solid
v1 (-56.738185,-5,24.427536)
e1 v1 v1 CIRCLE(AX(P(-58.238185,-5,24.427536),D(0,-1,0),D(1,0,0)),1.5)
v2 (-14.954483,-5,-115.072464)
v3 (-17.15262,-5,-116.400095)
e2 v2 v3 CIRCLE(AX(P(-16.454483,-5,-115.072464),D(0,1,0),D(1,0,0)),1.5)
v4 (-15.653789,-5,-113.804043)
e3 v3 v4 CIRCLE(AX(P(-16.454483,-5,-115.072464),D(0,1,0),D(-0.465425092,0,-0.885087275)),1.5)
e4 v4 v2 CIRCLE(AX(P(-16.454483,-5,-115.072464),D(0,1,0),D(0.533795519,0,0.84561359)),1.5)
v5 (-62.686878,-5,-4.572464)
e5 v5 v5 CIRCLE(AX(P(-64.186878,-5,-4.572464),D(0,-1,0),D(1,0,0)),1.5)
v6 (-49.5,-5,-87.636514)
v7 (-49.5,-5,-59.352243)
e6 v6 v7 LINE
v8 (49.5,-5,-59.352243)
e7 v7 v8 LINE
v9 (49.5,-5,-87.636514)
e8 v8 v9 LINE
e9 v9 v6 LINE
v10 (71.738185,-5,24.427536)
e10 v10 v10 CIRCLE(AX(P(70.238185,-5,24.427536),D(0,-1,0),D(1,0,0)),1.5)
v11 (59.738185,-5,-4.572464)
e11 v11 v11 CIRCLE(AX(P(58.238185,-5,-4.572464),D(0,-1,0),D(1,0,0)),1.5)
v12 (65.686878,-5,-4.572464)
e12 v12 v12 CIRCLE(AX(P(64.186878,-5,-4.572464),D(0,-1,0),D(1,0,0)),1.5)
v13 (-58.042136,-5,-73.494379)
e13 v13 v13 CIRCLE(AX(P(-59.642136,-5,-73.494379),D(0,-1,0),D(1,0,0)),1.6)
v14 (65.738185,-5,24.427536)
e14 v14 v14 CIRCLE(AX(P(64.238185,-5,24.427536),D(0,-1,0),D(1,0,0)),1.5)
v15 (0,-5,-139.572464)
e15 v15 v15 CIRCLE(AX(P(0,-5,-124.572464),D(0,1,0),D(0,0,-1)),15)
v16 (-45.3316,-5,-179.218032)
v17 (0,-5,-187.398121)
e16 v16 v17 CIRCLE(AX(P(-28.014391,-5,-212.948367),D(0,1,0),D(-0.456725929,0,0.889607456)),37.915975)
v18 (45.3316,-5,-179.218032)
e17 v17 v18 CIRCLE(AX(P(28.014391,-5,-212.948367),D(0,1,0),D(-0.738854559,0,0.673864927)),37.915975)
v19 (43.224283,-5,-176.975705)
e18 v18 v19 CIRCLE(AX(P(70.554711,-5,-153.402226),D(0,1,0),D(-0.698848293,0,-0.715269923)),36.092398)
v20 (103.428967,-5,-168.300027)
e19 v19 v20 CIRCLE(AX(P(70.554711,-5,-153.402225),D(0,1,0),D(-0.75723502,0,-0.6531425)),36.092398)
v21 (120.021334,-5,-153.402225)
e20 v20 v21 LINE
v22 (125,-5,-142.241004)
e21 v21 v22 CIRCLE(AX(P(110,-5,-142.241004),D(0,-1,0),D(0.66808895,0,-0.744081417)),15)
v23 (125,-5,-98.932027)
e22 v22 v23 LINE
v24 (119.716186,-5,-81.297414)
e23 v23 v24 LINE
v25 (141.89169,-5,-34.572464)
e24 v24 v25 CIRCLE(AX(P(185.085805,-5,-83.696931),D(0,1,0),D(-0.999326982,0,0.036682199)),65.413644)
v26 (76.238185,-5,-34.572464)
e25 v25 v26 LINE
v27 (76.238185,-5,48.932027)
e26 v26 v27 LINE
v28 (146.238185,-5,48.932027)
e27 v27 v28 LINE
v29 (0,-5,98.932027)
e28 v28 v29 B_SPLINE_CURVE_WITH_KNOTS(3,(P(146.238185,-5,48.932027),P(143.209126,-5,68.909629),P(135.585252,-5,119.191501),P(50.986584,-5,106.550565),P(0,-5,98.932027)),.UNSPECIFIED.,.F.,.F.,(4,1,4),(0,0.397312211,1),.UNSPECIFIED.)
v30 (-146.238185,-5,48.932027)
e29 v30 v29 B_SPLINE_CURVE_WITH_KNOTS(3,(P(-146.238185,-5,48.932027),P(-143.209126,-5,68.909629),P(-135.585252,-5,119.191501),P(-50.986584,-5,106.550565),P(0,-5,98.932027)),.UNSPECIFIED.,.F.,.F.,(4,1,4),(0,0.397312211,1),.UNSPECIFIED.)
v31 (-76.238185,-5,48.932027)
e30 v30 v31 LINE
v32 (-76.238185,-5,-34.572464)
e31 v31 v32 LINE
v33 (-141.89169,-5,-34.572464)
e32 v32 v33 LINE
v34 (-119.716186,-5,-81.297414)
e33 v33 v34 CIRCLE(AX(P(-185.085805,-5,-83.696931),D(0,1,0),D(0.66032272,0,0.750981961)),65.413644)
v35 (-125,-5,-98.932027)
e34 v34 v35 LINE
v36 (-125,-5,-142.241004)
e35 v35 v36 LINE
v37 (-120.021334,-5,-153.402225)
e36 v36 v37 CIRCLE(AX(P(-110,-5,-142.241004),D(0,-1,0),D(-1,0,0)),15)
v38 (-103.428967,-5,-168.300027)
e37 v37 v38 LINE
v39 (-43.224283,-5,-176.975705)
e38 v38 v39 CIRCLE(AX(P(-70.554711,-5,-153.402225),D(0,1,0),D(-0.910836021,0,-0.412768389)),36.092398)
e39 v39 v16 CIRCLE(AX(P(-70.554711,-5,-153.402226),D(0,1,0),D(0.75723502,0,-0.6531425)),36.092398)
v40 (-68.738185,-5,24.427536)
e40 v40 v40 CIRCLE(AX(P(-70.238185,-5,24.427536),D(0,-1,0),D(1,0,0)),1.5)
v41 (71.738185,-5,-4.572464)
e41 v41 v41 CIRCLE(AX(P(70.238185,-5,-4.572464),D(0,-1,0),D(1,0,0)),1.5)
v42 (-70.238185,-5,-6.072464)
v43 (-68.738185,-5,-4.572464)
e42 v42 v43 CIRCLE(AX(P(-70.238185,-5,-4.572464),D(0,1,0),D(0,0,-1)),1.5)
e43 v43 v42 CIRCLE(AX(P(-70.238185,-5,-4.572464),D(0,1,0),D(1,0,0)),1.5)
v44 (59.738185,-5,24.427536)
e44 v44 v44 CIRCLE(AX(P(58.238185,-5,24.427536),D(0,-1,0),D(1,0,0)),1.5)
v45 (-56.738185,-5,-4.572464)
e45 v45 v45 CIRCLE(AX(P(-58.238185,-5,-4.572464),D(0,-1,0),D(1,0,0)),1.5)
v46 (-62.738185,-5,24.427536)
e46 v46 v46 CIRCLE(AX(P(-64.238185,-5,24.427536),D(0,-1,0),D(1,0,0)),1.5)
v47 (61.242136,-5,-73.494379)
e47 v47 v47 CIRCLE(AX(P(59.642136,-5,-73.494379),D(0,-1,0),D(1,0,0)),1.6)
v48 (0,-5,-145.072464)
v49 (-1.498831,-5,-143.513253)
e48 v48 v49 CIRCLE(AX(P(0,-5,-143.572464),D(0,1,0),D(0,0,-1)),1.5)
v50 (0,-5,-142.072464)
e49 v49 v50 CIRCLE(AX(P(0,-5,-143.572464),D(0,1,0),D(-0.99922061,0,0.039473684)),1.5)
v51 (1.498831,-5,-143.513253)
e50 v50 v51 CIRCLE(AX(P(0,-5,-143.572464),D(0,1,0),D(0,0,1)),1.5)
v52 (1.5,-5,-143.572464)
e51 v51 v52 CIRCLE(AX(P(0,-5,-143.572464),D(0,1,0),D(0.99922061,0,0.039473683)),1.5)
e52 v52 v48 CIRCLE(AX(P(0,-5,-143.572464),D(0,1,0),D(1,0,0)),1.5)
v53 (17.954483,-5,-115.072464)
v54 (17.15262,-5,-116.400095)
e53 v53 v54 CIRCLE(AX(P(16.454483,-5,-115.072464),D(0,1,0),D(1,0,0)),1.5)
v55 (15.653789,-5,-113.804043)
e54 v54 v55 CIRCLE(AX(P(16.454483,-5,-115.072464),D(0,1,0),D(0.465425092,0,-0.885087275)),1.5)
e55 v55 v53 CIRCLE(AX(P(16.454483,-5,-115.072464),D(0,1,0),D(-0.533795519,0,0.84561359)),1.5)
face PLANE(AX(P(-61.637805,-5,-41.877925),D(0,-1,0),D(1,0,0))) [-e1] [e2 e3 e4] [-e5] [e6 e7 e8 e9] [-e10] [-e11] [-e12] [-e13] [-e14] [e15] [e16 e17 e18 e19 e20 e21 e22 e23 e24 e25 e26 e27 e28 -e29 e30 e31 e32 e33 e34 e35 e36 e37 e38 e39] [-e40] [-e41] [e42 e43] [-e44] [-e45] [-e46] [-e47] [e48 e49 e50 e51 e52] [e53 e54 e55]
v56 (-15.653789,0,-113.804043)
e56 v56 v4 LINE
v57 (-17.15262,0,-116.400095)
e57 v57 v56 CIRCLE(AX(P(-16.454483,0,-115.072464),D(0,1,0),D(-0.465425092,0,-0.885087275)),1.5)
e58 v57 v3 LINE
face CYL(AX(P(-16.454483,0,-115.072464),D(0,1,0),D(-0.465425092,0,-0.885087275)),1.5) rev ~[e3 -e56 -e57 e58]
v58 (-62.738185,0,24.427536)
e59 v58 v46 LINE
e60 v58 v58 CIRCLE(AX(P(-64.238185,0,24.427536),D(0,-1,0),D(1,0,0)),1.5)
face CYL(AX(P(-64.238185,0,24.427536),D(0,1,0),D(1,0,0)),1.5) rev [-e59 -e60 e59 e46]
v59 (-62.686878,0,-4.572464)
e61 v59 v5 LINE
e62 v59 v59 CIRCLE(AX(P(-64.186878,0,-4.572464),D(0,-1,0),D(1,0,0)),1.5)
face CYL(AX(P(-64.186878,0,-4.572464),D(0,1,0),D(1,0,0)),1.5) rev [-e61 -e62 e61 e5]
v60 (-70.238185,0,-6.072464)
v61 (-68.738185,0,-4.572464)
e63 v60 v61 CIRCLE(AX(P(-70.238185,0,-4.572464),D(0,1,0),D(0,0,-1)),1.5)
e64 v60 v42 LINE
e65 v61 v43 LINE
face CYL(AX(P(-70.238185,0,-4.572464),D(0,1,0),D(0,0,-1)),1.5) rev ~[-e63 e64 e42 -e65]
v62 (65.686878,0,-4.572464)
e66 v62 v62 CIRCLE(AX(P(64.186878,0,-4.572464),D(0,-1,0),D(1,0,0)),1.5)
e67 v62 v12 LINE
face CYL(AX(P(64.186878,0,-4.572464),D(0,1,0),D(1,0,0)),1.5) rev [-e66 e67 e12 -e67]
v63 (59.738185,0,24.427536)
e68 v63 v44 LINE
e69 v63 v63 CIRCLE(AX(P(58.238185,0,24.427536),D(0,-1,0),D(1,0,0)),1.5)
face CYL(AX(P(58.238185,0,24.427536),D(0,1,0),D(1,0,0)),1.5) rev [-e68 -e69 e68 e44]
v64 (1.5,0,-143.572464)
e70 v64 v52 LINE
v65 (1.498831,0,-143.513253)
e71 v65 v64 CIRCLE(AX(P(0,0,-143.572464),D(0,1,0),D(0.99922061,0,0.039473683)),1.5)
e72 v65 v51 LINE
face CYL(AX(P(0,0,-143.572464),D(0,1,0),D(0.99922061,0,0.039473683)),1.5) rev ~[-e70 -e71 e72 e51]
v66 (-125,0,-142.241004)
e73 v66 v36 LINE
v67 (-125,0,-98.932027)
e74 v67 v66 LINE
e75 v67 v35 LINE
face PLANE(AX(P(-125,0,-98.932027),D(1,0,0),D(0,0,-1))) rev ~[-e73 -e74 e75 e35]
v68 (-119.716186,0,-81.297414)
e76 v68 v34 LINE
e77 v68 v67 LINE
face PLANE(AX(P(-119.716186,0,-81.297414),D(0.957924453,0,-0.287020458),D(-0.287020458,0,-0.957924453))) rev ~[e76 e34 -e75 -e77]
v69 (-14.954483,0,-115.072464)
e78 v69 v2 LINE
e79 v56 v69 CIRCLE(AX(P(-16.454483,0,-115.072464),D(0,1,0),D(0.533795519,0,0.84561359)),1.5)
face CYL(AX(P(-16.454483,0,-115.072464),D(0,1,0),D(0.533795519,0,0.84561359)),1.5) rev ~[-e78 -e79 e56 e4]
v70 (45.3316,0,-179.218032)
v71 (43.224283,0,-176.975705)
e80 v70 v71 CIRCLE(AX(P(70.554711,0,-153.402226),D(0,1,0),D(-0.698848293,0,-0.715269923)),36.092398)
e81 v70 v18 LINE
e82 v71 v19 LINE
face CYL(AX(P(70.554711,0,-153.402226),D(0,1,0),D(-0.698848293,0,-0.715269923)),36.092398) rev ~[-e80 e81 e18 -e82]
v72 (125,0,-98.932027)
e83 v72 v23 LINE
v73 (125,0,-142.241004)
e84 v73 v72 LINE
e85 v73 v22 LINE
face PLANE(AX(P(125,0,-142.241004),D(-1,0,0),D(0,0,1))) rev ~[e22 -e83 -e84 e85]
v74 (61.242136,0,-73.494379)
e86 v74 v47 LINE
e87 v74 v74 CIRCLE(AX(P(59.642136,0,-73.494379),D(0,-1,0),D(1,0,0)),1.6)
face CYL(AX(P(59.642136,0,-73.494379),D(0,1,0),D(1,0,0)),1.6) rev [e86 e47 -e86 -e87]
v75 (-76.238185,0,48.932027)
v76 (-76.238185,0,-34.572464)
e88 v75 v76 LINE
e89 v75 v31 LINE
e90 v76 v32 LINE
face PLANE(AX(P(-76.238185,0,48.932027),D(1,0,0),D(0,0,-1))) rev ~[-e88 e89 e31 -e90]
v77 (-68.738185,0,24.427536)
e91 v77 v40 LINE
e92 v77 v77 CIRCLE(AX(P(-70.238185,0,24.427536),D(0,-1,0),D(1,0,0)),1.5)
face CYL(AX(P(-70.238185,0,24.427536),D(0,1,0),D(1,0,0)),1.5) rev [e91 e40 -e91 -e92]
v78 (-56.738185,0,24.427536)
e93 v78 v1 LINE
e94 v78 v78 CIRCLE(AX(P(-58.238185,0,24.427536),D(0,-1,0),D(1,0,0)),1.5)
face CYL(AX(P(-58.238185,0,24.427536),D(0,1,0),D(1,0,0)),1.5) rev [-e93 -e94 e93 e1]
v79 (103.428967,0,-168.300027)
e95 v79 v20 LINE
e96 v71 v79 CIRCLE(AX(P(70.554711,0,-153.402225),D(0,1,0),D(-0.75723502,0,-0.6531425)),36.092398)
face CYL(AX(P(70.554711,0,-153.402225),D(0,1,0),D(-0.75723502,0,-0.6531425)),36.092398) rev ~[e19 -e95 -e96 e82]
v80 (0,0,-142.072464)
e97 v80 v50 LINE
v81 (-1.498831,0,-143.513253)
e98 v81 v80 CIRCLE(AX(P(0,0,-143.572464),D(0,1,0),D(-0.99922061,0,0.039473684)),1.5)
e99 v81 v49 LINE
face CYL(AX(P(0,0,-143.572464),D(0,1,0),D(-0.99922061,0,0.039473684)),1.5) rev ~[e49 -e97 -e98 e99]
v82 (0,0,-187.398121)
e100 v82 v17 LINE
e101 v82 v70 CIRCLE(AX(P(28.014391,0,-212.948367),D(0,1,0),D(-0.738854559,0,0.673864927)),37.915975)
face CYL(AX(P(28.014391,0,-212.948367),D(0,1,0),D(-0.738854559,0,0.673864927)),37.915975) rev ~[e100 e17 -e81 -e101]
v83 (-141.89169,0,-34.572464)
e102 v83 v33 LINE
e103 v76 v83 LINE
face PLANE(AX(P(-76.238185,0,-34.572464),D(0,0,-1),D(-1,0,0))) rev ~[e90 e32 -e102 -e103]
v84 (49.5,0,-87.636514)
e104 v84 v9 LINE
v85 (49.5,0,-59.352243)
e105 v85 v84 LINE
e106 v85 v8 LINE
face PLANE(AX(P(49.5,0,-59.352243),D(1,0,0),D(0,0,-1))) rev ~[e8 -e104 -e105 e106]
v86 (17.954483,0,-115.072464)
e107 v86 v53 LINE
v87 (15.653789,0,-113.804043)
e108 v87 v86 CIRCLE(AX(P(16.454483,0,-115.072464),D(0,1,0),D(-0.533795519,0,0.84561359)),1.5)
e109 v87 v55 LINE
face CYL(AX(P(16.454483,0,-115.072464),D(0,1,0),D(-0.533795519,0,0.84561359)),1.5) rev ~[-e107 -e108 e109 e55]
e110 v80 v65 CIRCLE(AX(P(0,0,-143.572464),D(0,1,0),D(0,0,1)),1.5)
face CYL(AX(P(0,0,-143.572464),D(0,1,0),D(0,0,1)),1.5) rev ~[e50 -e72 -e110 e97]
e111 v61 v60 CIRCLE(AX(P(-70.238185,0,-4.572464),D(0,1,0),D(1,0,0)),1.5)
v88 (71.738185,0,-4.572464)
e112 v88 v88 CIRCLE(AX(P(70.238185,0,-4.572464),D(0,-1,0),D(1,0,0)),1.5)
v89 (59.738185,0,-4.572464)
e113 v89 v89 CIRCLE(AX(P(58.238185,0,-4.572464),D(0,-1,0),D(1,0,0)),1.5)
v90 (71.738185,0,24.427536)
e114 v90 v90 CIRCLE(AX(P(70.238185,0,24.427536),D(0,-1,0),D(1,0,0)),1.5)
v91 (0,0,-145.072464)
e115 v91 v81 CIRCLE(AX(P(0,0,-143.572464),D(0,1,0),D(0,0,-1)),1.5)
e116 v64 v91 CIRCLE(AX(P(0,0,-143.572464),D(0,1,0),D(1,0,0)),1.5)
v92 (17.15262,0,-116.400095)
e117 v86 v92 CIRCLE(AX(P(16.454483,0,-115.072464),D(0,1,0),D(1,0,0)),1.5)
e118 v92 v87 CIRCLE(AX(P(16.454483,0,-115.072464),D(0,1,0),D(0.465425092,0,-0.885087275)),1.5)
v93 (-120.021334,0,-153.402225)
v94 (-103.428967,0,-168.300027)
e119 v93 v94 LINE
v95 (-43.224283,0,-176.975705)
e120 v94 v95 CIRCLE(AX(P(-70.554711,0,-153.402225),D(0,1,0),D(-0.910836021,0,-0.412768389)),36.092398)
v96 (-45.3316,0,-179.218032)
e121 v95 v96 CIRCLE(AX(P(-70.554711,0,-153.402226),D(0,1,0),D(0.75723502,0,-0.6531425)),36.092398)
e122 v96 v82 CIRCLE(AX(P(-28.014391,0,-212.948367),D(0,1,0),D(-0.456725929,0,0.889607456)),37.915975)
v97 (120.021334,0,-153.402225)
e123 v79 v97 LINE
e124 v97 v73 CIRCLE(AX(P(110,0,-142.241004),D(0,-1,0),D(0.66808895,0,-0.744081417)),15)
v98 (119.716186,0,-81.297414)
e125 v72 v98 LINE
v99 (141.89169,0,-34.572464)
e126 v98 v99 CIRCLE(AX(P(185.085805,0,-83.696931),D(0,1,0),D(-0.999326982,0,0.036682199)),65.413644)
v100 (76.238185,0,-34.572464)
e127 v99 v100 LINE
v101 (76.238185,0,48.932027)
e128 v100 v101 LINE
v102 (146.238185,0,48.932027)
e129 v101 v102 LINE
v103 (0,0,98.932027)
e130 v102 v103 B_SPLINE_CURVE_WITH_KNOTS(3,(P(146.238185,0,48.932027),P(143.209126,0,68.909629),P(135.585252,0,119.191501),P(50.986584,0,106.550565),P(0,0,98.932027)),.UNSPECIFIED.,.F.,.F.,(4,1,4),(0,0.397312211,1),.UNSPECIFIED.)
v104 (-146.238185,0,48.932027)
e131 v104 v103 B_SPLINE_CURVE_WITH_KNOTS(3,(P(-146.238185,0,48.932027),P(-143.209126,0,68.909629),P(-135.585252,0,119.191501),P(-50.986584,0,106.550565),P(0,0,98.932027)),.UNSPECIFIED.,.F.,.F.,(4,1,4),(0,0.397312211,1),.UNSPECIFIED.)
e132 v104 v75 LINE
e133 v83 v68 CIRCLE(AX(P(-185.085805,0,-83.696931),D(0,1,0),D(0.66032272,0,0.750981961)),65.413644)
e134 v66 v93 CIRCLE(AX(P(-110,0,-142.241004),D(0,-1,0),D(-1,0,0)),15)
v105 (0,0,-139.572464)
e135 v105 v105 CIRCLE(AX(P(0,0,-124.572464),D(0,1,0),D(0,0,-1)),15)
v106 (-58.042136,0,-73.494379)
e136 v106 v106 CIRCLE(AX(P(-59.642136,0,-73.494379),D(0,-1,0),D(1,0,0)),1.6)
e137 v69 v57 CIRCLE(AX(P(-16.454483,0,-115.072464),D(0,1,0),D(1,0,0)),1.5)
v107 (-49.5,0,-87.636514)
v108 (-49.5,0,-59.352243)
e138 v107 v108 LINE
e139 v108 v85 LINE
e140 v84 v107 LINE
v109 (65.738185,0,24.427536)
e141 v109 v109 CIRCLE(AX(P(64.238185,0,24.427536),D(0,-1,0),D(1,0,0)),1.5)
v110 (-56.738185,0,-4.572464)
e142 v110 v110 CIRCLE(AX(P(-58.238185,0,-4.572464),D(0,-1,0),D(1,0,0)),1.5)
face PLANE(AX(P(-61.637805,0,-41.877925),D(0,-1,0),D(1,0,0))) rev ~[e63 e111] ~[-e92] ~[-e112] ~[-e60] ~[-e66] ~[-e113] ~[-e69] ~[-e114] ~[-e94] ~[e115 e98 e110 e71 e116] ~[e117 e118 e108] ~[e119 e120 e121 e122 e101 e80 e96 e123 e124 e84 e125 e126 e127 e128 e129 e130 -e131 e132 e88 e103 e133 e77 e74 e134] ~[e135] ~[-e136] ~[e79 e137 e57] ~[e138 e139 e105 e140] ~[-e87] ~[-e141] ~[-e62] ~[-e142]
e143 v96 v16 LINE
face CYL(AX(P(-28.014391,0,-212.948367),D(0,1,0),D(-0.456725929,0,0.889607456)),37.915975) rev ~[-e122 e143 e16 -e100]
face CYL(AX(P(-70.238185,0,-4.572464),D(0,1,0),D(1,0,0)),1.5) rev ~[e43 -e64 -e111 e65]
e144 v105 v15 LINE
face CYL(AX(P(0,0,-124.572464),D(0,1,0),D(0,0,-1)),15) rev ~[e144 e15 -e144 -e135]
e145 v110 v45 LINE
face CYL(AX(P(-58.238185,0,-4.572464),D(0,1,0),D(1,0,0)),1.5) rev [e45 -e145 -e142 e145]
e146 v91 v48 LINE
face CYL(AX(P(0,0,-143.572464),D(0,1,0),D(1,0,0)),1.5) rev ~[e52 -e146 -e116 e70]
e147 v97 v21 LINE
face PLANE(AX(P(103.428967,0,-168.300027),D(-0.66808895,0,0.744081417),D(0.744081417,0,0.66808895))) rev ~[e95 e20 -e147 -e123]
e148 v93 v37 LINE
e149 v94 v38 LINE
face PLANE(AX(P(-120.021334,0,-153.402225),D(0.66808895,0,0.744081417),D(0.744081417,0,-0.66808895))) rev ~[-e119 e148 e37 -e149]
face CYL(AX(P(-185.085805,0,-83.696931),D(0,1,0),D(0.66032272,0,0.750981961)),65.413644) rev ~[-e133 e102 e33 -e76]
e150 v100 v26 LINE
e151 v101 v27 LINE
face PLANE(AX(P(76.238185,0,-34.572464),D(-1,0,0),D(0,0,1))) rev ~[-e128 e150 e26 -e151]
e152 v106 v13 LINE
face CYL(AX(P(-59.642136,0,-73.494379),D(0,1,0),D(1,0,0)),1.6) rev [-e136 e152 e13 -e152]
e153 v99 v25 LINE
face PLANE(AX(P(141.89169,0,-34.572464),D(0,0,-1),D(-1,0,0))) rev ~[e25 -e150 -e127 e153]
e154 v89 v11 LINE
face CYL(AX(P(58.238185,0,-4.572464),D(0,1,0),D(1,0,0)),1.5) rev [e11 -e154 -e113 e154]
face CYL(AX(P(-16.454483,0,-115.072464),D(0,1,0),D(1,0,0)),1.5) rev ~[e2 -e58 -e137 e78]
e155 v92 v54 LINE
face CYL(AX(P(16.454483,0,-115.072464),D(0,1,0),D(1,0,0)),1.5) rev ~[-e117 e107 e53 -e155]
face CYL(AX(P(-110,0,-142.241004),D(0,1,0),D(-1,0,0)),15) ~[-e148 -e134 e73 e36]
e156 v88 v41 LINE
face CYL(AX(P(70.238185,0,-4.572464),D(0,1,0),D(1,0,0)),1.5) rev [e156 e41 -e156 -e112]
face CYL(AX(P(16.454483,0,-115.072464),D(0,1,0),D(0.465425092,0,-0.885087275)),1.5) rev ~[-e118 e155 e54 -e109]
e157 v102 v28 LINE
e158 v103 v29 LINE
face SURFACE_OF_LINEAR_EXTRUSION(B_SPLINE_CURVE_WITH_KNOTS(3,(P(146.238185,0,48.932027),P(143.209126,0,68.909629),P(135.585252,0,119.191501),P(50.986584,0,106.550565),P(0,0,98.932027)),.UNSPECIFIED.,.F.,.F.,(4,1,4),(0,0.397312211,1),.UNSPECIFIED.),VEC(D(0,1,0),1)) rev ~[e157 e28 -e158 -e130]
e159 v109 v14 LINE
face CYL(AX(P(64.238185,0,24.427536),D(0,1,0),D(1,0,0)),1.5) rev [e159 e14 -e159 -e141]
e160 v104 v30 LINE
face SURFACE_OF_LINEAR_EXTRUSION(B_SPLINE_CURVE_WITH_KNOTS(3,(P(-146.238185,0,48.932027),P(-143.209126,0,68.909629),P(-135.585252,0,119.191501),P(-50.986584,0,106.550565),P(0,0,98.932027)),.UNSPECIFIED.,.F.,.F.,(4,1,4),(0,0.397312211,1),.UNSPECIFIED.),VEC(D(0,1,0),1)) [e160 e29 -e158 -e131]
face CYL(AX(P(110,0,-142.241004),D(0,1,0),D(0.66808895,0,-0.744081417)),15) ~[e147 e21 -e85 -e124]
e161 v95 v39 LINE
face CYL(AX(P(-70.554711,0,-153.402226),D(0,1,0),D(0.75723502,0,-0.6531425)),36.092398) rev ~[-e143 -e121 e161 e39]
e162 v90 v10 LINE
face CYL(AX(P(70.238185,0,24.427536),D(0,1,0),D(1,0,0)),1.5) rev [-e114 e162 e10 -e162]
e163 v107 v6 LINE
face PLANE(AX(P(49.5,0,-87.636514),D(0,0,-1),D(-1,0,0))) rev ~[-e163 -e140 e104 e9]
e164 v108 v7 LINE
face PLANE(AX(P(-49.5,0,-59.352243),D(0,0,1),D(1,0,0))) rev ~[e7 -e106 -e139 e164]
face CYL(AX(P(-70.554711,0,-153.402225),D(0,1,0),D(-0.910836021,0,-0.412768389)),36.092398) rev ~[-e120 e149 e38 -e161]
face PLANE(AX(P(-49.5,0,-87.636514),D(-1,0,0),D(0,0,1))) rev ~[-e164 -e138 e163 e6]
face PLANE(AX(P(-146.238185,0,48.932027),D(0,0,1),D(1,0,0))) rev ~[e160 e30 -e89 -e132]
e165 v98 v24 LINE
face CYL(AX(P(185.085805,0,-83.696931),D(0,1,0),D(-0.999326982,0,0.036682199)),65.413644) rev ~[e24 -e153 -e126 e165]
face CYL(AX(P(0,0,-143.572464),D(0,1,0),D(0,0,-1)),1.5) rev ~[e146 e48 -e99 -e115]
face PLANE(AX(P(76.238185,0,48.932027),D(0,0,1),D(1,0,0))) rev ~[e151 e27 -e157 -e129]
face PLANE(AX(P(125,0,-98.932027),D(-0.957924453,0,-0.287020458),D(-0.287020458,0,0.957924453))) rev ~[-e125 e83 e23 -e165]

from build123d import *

# Parameters (mm, degrees)
F0_R     = 1.6
F0_R_2   = 1.5
F1_DEPTH = 5


with BuildPart() as f1:
    # F0 (on Front) → F1 (new body)
    with BuildSketch(Plane.XZ):
        with BuildLine():
            Line((0, -105.5724638663), (0, -98.9320270717))
            Line((0, -98.9320270717), (0, -87.6365141757))
            Line((0, -87.6365141757), (-49.5, -87.6365141757))
            Line((-49.5, -87.6365141757), (-49.5, -59.3522429283))
            Line((-49.5, -59.3522429283), (0, -59.3522429283))
            Line((0, -59.3522429283), (0, 98.9320270717))
            add(Edge.make_bspline(
                [(-146.2381845713, 48.9320270717), (-143.2091262015, 68.9096288331), (-135.5852518703, 119.1915008468), (-50.9865840375, 106.55056484), (0, 98.9320270717)],
                knots=[0, 0, 0, 0, 0.3973122114, 1, 1, 1, 1], degree=3))
            Line((-146.2381845713, 48.9320270717), (-125, 48.9320270717))
            Line((-125, 48.9320270717), (-76.2381845713, 48.9320270717))
            Line((-76.2381845713, 48.9320270717), (-76.2381845713, -34.5724638663))
            Line((-76.2381845713, -34.5724638663), (-141.8916900928, -34.5724638663))
            ThreePointArc((-141.8916900928, -34.5724638663), (-125.9898971587, -55.6502114599), (-119.7161859861, -81.2974142364))
            Line((-119.7161859861, -81.2974142364), (-125, -98.9320270717))
            Line((-125, -98.9320270717), (-125, -142.2410042337))
            ThreePointArc((-125, -142.2410042337), (-123.6989053151, -148.3516501216), (-120.0213342443, -153.4022254914))
            Line((-120.0213342443, -153.4022254914), (-103.4289673704, -168.3000265931))
            ThreePointArc((-103.4289673704, -168.3000265931), (-65.4068612322, -117.6788317827), (-43.2242829938, -176.9757047349))
            ThreePointArc((-43.2242829938, -176.9757047349), (-44.2540337338, -178.1193368484), (-45.3315999714, -179.2180324392))
            ThreePointArc((-45.3315999714, -179.2180324392), (-21.2811980726, -175.6350274134), (0, -187.3981207609))
            Line((0, -187.3981207609), (0, -179.2180324392))
            Line((0, -179.2180324392), (0, -145.0724638663))
            ThreePointArc((0, -145.0724638663), (-1.0813916472, -144.6119791886), (-1.4988309156, -143.51325334))
            ThreePointArc((-1.4988309156, -143.51325334), (-16.4544826719, -134.0724638663), (-17.1526203097, -116.4000947784))
            ThreePointArc((-17.1526203097, -116.4000947784), (-17.7535207776, -114.3224638663), (-15.6537893941, -113.8040434806))
            ThreePointArc((-15.6537893941, -113.8040434806), (-8.843076746, -107.755805647), (0, -105.5724638663))
        make_face()
        with Locations((-59.6421356237, -73.494378552)):
            Circle(F0_R, mode=Mode.SUBTRACT)
        with BuildLine():
            ThreePointArc((-70.2381845713, -6.0724638663), (-71.298844743, -3.5118036945), (-68.7381845713, -4.5724638663))
            ThreePointArc((-68.7381845713, -4.5724638663), (-69.1775243995, -5.6331240381), (-70.2381845713, -6.0724638663))
        make_face(mode=Mode.SUBTRACT)
        with Locations((-64.1868777356, -4.5724638663)):
            Circle(F0_R_2, mode=Mode.SUBTRACT)
        with Locations((-58.2381845713, -4.5724638663)):
            Circle(F0_R_2, mode=Mode.SUBTRACT)
        with Locations((-70.2381845713, 24.4275361337)):
            Circle(F0_R_2, mode=Mode.SUBTRACT)
        with Locations((-64.2381845713, 24.4275361337)):
            Circle(F0_R_2, mode=Mode.SUBTRACT)
        with Locations((-58.2381845713, 24.4275361337)):
            Circle(F0_R_2, mode=Mode.SUBTRACT)
        with BuildLine():
            Line((0, -87.6365141757), (0, -98.9320270717))
            Line((0, -98.9320270717), (0, -105.5724638663))
            ThreePointArc((0, -105.5724638663), (8.843076746, -107.755805647), (15.6537893941, -113.8040434806))
            ThreePointArc((15.6537893941, -113.8040434806), (17.178692615, -113.7588733828), (17.9544826719, -115.0724638663))
            ThreePointArc((17.9544826719, -115.0724638663), (17.738462122, -115.8479616237), (17.1526203097, -116.4000947784))
            ThreePointArc((17.1526203097, -116.4000947784), (18.5324011651, -120.3831790756), (19, -124.5724638663))
            ThreePointArc((19, -124.5724638663), (13.9548878067, -137.4666915013), (1.4988309156, -143.51325334))
            ThreePointArc((1.4988309156, -143.51325334), (1.4997077004, -143.542852833), (1.5, -143.5724638663))
            ThreePointArc((1.5, -143.5724638663), (1.0606601718, -144.6331240381), (0, -145.0724638663))
            Line((0, -145.0724638663), (0, -179.2180324392))
            Line((0, -179.2180324392), (0, -187.3981207609))
            ThreePointArc((0, -187.3981207609), (21.2811980726, -175.6350274134), (45.3315999714, -179.2180324392))
            ThreePointArc((45.3315999714, -179.2180324392), (44.2540337338, -178.1193368484), (43.2242829938, -176.9757047349))
            ThreePointArc((43.2242829938, -176.9757047349), (65.4068612322, -117.6788317827), (103.4289673704, -168.3000265931))
            Line((103.4289673704, -168.3000265931), (120.0213342443, -153.4022254914))
            ThreePointArc((120.0213342443, -153.4022254914), (123.6989053151, -148.3516501216), (125, -142.2410042337))
            Line((125, -142.2410042337), (125, -98.9320270717))
            Line((125, -98.9320270717), (119.7161859861, -81.2974142364))
            ThreePointArc((119.7161859861, -81.2974142364), (125.9898971587, -55.6502114599), (141.8916900928, -34.5724638663))
            Line((141.8916900928, -34.5724638663), (76.2381845713, -34.5724638663))
            Line((76.2381845713, -34.5724638663), (76.2381845713, 48.9320270717))
            Line((76.2381845713, 48.9320270717), (125, 48.9320270717))
            Line((125, 48.9320270717), (146.2381845713, 48.9320270717))
            add(Edge.make_bspline(
                [(146.2381845713, 48.9320270717), (143.2091262015, 68.9096288331), (135.5852518703, 119.1915008468), (50.9865840375, 106.55056484), (0, 98.9320270717)],
                knots=[0, 0, 0, 0, 0.3973122114, 1, 1, 1, 1], degree=3))
            Line((0, 98.9320270717), (0, -59.3522429283))
            Line((0, -59.3522429283), (49.5, -59.3522429283))
            Line((49.5, -59.3522429283), (49.5, -87.6365141757))
            Line((49.5, -87.6365141757), (0, -87.6365141757))
        make_face()
        with Locations((59.6421356237, -73.494378552)):
            Circle(F0_R, mode=Mode.SUBTRACT)
        with Locations((58.2381845713, -4.5724638663)):
            Circle(F0_R_2, mode=Mode.SUBTRACT)
        with Locations((64.1868777356, -4.5724638663)):
            Circle(F0_R_2, mode=Mode.SUBTRACT)
        with Locations((70.2381845713, -4.5724638663)):
            Circle(F0_R_2, mode=Mode.SUBTRACT)
        with Locations((58.2381845713, 24.4275361337)):
            Circle(F0_R_2, mode=Mode.SUBTRACT)
        with Locations((64.2381845713, 24.4275361337)):
            Circle(F0_R_2, mode=Mode.SUBTRACT)
        with Locations((70.2381845713, 24.4275361337)):
            Circle(F0_R_2, mode=Mode.SUBTRACT)
        with BuildLine():
            ThreePointArc((15.6537893941, -113.8040434806), (8.843076746, -107.755805647), (0, -105.5724638663))
            Line((0, -105.5724638663), (0, -109.5724638663))
            ThreePointArc((0, -109.5724638663), (10.6066017178, -113.9658621485), (15, -124.5724638663))
            ThreePointArc((15, -124.5724638663), (10.6066017178, -135.1790655841), (0, -139.5724638663))
            Line((0, -139.5724638663), (0, -142.0724638663))
            ThreePointArc((0, -142.0724638663), (1.0395153223, -142.4910722191), (1.4988309156, -143.51325334))
            ThreePointArc((1.4988309156, -143.51325334), (13.9548878067, -137.4666915013), (19, -124.5724638663))
            ThreePointArc((19, -124.5724638663), (18.5324011651, -120.3831790756), (17.1526203097, -116.4000947784))
            ThreePointArc((17.1526203097, -116.4000947784), (15.1554445662, -115.8224638663), (15.6537893941, -113.8040434806))
        make_face()
        with BuildLine():
            Line((0, -109.5724638663), (0, -105.5724638663))
            ThreePointArc((0, -105.5724638663), (-8.843076746, -107.755805647), (-15.6537893941, -113.8040434806))
            ThreePointArc((-15.6537893941, -113.8040434806), (-15.1408921884, -114.3482539232), (-14.9544826719, -115.0724638663))
            ThreePointArc((-14.9544826719, -115.0724638663), (-15.6789849146, -116.3564433165), (-17.1526203097, -116.4000947784))
            ThreePointArc((-17.1526203097, -116.4000947784), (-16.4544826719, -134.0724638663), (-1.4988309156, -143.51325334))
            ThreePointArc((-1.4988309156, -143.51325334), (-1.0395153223, -142.4910722191), (0, -142.0724638663))
            Line((0, -142.0724638663), (0, -139.5724638663))
            ThreePointArc((0, -139.5724638663), (-15, -124.5724638663), (0, -109.5724638663))
        make_face()
    extrude(amount=F1_DEPTH)


solid = f1.part
